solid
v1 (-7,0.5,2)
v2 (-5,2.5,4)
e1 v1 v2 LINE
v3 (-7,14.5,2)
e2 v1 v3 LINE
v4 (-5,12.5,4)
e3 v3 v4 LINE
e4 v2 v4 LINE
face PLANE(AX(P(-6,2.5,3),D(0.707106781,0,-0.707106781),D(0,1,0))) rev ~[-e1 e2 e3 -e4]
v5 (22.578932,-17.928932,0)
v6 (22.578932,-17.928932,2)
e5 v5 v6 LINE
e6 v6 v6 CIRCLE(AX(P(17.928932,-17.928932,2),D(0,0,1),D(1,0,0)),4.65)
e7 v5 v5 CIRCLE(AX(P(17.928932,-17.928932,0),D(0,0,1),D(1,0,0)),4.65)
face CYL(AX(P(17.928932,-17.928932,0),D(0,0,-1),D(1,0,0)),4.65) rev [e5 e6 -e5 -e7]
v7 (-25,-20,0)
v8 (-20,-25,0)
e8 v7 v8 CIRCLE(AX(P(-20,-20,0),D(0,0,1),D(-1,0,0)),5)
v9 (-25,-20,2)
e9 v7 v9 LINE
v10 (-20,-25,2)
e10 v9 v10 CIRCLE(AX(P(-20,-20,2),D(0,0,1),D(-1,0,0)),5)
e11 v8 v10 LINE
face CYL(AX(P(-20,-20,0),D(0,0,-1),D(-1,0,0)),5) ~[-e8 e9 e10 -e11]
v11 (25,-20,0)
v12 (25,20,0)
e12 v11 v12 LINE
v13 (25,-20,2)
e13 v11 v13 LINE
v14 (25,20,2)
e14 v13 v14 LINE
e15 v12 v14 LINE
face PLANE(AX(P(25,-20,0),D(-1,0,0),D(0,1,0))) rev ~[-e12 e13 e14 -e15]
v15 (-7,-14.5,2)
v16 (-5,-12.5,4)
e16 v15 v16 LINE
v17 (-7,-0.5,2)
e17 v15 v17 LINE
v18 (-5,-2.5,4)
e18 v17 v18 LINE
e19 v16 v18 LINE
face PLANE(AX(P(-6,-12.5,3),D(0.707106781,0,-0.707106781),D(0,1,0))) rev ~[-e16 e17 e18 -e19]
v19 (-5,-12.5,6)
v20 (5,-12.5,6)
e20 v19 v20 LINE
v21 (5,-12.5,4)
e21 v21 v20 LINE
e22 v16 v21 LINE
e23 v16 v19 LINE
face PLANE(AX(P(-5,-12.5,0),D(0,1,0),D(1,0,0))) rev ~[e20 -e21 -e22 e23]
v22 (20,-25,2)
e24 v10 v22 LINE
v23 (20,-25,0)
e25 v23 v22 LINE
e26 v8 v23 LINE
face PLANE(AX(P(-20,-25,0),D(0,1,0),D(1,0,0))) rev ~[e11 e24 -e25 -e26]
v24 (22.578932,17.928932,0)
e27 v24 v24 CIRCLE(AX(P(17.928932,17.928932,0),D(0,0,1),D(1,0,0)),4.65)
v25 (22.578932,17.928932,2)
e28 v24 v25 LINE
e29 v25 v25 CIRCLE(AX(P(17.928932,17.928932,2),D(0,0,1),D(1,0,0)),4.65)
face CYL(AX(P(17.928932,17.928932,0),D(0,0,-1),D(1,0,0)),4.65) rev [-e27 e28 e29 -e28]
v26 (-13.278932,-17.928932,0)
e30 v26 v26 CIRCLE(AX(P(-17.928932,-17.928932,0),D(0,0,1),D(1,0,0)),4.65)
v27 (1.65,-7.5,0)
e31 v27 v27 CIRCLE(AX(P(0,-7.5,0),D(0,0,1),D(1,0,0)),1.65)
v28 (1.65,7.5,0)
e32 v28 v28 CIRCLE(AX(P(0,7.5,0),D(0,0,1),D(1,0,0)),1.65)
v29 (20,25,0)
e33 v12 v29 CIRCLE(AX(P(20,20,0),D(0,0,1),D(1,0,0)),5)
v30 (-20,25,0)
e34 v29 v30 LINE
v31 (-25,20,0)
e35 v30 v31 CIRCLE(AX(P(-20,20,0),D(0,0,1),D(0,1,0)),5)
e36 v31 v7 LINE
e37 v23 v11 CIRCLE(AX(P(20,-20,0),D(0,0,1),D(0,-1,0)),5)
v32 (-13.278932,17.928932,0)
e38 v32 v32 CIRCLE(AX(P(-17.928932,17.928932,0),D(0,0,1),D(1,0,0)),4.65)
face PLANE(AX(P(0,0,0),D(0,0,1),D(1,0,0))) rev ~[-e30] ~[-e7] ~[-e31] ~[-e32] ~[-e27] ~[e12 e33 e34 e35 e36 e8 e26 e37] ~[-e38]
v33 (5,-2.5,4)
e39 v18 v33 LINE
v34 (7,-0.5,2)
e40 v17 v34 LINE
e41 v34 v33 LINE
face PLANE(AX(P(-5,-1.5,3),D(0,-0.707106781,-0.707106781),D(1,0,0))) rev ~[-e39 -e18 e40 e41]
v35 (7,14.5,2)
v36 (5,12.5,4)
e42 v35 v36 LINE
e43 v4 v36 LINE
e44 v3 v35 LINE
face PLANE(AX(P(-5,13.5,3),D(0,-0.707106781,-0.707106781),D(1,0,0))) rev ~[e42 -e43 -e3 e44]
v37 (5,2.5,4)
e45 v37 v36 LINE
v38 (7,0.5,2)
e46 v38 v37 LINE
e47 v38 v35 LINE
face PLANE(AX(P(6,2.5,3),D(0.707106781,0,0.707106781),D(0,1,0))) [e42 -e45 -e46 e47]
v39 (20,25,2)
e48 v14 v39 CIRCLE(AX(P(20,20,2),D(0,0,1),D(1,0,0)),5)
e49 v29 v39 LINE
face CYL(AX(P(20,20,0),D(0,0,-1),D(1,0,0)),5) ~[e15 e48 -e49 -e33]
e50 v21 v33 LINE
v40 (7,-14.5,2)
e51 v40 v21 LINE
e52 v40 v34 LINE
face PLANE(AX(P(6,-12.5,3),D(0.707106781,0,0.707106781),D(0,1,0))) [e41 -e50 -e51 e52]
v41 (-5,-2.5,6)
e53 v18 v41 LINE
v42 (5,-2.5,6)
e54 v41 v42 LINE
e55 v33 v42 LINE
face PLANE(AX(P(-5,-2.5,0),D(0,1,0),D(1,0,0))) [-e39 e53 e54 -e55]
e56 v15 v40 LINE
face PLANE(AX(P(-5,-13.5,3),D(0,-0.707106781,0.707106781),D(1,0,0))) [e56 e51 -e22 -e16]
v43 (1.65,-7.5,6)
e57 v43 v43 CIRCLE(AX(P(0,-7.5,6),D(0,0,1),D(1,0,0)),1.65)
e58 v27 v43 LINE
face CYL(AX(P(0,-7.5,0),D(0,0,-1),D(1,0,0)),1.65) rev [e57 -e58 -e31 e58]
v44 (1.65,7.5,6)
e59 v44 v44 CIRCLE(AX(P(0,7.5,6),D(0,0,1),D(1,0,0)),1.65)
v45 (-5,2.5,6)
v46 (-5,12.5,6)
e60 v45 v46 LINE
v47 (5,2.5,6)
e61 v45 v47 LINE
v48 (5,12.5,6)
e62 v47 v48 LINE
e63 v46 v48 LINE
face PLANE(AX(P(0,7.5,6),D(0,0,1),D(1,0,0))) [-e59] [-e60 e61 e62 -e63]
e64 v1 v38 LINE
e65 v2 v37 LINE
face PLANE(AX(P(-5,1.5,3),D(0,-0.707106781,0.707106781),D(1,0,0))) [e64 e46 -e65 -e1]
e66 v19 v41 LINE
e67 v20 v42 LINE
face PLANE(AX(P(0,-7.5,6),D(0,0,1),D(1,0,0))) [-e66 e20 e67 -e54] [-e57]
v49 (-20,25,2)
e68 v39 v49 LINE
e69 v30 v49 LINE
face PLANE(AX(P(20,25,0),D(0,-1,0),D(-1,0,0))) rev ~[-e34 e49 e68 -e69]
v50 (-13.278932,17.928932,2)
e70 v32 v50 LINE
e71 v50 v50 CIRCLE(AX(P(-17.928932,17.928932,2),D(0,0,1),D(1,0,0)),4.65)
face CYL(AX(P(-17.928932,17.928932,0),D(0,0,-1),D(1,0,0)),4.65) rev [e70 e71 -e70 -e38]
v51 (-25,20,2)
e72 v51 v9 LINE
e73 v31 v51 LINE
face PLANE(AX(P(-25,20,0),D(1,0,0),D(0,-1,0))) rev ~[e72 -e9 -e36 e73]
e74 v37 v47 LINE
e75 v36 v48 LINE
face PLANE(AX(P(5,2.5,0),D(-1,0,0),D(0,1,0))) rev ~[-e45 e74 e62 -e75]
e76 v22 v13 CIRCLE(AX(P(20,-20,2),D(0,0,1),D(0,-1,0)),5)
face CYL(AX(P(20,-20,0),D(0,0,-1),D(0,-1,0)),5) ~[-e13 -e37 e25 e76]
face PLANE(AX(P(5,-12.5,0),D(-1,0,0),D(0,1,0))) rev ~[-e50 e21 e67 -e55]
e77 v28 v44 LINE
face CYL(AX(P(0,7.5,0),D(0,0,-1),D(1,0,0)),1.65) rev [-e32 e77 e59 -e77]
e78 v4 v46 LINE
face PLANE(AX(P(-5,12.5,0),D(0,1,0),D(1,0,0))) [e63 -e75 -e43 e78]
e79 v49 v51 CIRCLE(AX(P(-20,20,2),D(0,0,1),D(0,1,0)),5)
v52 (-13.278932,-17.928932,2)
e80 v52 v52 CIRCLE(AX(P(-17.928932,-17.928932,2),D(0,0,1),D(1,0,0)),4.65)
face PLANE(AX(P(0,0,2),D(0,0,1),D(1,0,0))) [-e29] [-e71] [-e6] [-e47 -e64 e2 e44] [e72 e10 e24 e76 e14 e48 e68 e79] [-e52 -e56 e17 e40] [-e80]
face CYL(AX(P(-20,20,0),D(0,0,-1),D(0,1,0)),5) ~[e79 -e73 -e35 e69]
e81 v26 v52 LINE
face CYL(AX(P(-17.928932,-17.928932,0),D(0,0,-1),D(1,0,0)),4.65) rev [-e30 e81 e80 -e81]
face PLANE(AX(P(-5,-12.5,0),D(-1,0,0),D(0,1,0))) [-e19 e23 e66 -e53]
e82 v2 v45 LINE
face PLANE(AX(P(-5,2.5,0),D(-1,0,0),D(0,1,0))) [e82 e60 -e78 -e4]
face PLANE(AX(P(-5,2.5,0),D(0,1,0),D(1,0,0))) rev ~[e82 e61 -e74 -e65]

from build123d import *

# Parameters (mm, degrees)
F0_W     = 10
F0_H     = 10
F0_R     = 1.65
F1_DEPTH = 6
F0_R_2   = 4.65
F2_DEPTH = 2
F3_SIZE  = 2


with BuildPart() as f1:
    # F0 (on Top) → F1 (new body)
    with BuildSketch(Plane.XY):
        with Locations((0, 7.5)):
            Rectangle(F0_W, F0_H)
        with Locations((0, 7.5)):
            Circle(F0_R, mode=Mode.SUBTRACT)
    extrude(amount=F1_DEPTH)



with BuildPart() as f1b:
    # F0 (on Top) → F1, piece 2 (new body)
    with BuildSketch(Plane.XY):
        with Locations((0, -7.5)):
            Rectangle(F0_W, F0_H)
        with Locations((0, -7.5)):
            Circle(F0_R, mode=Mode.SUBTRACT)
    extrude(amount=F1_DEPTH)


with BuildPart() as f1_1:
    add(f1.part)

    add(f1b.part)  # F2 merges F1b
    # F0 (on Top) → F2 (join)
    with BuildSketch(Plane.XY):
        with BuildLine():
            Line((20, 25), (-20, 25))
            ThreePointArc((-20, 25), (-23.5355339059, 23.5355339059), (-25, 20))
            Line((-25, 20), (-25, -20))
            ThreePointArc((-25, -20), (-23.5355339059, -23.5355339059), (-20, -25))
            Line((-20, -25), (20, -25))
            ThreePointArc((20, -25), (23.5355339059, -23.5355339059), (25, -20))
            Line((25, -20), (25, 20))
            ThreePointArc((25, 20), (23.5355339059, 23.5355339059), (20, 25))
        make_face()
        with Locations((-17.9289321881, -17.9289321881)):
            Circle(F0_R_2, mode=Mode.SUBTRACT)
        with Locations((17.9289321881, -17.9289321881)):
            Circle(F0_R_2, mode=Mode.SUBTRACT)
        with Locations((0, -7.5)):
            Rectangle(F0_W, F0_H, mode=Mode.SUBTRACT)
        with Locations((-17.9289321881, 17.9289321881)):
            Circle(F0_R_2, mode=Mode.SUBTRACT)
        with Locations((0, 7.5)):
            Rectangle(F0_W, F0_H, mode=Mode.SUBTRACT)
        with Locations((17.9289321881, 17.9289321881)):
            Circle(F0_R_2, mode=Mode.SUBTRACT)
    extrude(amount=F2_DEPTH)

    # F3
    f3_edges = [f1_1.edges().sort_by_distance(p)[0] for p in [
        (0, -12.5, 2),
        (5, -7.5, 2),
        (5, 7.5, 2),
        (0, 2.5, 2),
        (0, -2.5, 2),
        (0, 12.5, 2),
        (-5, 7.5, 2),
        (-5, -7.5, 2),
    ]]
    chamfer(f3_edges, length=F3_SIZE)


solid = f1_1.part
